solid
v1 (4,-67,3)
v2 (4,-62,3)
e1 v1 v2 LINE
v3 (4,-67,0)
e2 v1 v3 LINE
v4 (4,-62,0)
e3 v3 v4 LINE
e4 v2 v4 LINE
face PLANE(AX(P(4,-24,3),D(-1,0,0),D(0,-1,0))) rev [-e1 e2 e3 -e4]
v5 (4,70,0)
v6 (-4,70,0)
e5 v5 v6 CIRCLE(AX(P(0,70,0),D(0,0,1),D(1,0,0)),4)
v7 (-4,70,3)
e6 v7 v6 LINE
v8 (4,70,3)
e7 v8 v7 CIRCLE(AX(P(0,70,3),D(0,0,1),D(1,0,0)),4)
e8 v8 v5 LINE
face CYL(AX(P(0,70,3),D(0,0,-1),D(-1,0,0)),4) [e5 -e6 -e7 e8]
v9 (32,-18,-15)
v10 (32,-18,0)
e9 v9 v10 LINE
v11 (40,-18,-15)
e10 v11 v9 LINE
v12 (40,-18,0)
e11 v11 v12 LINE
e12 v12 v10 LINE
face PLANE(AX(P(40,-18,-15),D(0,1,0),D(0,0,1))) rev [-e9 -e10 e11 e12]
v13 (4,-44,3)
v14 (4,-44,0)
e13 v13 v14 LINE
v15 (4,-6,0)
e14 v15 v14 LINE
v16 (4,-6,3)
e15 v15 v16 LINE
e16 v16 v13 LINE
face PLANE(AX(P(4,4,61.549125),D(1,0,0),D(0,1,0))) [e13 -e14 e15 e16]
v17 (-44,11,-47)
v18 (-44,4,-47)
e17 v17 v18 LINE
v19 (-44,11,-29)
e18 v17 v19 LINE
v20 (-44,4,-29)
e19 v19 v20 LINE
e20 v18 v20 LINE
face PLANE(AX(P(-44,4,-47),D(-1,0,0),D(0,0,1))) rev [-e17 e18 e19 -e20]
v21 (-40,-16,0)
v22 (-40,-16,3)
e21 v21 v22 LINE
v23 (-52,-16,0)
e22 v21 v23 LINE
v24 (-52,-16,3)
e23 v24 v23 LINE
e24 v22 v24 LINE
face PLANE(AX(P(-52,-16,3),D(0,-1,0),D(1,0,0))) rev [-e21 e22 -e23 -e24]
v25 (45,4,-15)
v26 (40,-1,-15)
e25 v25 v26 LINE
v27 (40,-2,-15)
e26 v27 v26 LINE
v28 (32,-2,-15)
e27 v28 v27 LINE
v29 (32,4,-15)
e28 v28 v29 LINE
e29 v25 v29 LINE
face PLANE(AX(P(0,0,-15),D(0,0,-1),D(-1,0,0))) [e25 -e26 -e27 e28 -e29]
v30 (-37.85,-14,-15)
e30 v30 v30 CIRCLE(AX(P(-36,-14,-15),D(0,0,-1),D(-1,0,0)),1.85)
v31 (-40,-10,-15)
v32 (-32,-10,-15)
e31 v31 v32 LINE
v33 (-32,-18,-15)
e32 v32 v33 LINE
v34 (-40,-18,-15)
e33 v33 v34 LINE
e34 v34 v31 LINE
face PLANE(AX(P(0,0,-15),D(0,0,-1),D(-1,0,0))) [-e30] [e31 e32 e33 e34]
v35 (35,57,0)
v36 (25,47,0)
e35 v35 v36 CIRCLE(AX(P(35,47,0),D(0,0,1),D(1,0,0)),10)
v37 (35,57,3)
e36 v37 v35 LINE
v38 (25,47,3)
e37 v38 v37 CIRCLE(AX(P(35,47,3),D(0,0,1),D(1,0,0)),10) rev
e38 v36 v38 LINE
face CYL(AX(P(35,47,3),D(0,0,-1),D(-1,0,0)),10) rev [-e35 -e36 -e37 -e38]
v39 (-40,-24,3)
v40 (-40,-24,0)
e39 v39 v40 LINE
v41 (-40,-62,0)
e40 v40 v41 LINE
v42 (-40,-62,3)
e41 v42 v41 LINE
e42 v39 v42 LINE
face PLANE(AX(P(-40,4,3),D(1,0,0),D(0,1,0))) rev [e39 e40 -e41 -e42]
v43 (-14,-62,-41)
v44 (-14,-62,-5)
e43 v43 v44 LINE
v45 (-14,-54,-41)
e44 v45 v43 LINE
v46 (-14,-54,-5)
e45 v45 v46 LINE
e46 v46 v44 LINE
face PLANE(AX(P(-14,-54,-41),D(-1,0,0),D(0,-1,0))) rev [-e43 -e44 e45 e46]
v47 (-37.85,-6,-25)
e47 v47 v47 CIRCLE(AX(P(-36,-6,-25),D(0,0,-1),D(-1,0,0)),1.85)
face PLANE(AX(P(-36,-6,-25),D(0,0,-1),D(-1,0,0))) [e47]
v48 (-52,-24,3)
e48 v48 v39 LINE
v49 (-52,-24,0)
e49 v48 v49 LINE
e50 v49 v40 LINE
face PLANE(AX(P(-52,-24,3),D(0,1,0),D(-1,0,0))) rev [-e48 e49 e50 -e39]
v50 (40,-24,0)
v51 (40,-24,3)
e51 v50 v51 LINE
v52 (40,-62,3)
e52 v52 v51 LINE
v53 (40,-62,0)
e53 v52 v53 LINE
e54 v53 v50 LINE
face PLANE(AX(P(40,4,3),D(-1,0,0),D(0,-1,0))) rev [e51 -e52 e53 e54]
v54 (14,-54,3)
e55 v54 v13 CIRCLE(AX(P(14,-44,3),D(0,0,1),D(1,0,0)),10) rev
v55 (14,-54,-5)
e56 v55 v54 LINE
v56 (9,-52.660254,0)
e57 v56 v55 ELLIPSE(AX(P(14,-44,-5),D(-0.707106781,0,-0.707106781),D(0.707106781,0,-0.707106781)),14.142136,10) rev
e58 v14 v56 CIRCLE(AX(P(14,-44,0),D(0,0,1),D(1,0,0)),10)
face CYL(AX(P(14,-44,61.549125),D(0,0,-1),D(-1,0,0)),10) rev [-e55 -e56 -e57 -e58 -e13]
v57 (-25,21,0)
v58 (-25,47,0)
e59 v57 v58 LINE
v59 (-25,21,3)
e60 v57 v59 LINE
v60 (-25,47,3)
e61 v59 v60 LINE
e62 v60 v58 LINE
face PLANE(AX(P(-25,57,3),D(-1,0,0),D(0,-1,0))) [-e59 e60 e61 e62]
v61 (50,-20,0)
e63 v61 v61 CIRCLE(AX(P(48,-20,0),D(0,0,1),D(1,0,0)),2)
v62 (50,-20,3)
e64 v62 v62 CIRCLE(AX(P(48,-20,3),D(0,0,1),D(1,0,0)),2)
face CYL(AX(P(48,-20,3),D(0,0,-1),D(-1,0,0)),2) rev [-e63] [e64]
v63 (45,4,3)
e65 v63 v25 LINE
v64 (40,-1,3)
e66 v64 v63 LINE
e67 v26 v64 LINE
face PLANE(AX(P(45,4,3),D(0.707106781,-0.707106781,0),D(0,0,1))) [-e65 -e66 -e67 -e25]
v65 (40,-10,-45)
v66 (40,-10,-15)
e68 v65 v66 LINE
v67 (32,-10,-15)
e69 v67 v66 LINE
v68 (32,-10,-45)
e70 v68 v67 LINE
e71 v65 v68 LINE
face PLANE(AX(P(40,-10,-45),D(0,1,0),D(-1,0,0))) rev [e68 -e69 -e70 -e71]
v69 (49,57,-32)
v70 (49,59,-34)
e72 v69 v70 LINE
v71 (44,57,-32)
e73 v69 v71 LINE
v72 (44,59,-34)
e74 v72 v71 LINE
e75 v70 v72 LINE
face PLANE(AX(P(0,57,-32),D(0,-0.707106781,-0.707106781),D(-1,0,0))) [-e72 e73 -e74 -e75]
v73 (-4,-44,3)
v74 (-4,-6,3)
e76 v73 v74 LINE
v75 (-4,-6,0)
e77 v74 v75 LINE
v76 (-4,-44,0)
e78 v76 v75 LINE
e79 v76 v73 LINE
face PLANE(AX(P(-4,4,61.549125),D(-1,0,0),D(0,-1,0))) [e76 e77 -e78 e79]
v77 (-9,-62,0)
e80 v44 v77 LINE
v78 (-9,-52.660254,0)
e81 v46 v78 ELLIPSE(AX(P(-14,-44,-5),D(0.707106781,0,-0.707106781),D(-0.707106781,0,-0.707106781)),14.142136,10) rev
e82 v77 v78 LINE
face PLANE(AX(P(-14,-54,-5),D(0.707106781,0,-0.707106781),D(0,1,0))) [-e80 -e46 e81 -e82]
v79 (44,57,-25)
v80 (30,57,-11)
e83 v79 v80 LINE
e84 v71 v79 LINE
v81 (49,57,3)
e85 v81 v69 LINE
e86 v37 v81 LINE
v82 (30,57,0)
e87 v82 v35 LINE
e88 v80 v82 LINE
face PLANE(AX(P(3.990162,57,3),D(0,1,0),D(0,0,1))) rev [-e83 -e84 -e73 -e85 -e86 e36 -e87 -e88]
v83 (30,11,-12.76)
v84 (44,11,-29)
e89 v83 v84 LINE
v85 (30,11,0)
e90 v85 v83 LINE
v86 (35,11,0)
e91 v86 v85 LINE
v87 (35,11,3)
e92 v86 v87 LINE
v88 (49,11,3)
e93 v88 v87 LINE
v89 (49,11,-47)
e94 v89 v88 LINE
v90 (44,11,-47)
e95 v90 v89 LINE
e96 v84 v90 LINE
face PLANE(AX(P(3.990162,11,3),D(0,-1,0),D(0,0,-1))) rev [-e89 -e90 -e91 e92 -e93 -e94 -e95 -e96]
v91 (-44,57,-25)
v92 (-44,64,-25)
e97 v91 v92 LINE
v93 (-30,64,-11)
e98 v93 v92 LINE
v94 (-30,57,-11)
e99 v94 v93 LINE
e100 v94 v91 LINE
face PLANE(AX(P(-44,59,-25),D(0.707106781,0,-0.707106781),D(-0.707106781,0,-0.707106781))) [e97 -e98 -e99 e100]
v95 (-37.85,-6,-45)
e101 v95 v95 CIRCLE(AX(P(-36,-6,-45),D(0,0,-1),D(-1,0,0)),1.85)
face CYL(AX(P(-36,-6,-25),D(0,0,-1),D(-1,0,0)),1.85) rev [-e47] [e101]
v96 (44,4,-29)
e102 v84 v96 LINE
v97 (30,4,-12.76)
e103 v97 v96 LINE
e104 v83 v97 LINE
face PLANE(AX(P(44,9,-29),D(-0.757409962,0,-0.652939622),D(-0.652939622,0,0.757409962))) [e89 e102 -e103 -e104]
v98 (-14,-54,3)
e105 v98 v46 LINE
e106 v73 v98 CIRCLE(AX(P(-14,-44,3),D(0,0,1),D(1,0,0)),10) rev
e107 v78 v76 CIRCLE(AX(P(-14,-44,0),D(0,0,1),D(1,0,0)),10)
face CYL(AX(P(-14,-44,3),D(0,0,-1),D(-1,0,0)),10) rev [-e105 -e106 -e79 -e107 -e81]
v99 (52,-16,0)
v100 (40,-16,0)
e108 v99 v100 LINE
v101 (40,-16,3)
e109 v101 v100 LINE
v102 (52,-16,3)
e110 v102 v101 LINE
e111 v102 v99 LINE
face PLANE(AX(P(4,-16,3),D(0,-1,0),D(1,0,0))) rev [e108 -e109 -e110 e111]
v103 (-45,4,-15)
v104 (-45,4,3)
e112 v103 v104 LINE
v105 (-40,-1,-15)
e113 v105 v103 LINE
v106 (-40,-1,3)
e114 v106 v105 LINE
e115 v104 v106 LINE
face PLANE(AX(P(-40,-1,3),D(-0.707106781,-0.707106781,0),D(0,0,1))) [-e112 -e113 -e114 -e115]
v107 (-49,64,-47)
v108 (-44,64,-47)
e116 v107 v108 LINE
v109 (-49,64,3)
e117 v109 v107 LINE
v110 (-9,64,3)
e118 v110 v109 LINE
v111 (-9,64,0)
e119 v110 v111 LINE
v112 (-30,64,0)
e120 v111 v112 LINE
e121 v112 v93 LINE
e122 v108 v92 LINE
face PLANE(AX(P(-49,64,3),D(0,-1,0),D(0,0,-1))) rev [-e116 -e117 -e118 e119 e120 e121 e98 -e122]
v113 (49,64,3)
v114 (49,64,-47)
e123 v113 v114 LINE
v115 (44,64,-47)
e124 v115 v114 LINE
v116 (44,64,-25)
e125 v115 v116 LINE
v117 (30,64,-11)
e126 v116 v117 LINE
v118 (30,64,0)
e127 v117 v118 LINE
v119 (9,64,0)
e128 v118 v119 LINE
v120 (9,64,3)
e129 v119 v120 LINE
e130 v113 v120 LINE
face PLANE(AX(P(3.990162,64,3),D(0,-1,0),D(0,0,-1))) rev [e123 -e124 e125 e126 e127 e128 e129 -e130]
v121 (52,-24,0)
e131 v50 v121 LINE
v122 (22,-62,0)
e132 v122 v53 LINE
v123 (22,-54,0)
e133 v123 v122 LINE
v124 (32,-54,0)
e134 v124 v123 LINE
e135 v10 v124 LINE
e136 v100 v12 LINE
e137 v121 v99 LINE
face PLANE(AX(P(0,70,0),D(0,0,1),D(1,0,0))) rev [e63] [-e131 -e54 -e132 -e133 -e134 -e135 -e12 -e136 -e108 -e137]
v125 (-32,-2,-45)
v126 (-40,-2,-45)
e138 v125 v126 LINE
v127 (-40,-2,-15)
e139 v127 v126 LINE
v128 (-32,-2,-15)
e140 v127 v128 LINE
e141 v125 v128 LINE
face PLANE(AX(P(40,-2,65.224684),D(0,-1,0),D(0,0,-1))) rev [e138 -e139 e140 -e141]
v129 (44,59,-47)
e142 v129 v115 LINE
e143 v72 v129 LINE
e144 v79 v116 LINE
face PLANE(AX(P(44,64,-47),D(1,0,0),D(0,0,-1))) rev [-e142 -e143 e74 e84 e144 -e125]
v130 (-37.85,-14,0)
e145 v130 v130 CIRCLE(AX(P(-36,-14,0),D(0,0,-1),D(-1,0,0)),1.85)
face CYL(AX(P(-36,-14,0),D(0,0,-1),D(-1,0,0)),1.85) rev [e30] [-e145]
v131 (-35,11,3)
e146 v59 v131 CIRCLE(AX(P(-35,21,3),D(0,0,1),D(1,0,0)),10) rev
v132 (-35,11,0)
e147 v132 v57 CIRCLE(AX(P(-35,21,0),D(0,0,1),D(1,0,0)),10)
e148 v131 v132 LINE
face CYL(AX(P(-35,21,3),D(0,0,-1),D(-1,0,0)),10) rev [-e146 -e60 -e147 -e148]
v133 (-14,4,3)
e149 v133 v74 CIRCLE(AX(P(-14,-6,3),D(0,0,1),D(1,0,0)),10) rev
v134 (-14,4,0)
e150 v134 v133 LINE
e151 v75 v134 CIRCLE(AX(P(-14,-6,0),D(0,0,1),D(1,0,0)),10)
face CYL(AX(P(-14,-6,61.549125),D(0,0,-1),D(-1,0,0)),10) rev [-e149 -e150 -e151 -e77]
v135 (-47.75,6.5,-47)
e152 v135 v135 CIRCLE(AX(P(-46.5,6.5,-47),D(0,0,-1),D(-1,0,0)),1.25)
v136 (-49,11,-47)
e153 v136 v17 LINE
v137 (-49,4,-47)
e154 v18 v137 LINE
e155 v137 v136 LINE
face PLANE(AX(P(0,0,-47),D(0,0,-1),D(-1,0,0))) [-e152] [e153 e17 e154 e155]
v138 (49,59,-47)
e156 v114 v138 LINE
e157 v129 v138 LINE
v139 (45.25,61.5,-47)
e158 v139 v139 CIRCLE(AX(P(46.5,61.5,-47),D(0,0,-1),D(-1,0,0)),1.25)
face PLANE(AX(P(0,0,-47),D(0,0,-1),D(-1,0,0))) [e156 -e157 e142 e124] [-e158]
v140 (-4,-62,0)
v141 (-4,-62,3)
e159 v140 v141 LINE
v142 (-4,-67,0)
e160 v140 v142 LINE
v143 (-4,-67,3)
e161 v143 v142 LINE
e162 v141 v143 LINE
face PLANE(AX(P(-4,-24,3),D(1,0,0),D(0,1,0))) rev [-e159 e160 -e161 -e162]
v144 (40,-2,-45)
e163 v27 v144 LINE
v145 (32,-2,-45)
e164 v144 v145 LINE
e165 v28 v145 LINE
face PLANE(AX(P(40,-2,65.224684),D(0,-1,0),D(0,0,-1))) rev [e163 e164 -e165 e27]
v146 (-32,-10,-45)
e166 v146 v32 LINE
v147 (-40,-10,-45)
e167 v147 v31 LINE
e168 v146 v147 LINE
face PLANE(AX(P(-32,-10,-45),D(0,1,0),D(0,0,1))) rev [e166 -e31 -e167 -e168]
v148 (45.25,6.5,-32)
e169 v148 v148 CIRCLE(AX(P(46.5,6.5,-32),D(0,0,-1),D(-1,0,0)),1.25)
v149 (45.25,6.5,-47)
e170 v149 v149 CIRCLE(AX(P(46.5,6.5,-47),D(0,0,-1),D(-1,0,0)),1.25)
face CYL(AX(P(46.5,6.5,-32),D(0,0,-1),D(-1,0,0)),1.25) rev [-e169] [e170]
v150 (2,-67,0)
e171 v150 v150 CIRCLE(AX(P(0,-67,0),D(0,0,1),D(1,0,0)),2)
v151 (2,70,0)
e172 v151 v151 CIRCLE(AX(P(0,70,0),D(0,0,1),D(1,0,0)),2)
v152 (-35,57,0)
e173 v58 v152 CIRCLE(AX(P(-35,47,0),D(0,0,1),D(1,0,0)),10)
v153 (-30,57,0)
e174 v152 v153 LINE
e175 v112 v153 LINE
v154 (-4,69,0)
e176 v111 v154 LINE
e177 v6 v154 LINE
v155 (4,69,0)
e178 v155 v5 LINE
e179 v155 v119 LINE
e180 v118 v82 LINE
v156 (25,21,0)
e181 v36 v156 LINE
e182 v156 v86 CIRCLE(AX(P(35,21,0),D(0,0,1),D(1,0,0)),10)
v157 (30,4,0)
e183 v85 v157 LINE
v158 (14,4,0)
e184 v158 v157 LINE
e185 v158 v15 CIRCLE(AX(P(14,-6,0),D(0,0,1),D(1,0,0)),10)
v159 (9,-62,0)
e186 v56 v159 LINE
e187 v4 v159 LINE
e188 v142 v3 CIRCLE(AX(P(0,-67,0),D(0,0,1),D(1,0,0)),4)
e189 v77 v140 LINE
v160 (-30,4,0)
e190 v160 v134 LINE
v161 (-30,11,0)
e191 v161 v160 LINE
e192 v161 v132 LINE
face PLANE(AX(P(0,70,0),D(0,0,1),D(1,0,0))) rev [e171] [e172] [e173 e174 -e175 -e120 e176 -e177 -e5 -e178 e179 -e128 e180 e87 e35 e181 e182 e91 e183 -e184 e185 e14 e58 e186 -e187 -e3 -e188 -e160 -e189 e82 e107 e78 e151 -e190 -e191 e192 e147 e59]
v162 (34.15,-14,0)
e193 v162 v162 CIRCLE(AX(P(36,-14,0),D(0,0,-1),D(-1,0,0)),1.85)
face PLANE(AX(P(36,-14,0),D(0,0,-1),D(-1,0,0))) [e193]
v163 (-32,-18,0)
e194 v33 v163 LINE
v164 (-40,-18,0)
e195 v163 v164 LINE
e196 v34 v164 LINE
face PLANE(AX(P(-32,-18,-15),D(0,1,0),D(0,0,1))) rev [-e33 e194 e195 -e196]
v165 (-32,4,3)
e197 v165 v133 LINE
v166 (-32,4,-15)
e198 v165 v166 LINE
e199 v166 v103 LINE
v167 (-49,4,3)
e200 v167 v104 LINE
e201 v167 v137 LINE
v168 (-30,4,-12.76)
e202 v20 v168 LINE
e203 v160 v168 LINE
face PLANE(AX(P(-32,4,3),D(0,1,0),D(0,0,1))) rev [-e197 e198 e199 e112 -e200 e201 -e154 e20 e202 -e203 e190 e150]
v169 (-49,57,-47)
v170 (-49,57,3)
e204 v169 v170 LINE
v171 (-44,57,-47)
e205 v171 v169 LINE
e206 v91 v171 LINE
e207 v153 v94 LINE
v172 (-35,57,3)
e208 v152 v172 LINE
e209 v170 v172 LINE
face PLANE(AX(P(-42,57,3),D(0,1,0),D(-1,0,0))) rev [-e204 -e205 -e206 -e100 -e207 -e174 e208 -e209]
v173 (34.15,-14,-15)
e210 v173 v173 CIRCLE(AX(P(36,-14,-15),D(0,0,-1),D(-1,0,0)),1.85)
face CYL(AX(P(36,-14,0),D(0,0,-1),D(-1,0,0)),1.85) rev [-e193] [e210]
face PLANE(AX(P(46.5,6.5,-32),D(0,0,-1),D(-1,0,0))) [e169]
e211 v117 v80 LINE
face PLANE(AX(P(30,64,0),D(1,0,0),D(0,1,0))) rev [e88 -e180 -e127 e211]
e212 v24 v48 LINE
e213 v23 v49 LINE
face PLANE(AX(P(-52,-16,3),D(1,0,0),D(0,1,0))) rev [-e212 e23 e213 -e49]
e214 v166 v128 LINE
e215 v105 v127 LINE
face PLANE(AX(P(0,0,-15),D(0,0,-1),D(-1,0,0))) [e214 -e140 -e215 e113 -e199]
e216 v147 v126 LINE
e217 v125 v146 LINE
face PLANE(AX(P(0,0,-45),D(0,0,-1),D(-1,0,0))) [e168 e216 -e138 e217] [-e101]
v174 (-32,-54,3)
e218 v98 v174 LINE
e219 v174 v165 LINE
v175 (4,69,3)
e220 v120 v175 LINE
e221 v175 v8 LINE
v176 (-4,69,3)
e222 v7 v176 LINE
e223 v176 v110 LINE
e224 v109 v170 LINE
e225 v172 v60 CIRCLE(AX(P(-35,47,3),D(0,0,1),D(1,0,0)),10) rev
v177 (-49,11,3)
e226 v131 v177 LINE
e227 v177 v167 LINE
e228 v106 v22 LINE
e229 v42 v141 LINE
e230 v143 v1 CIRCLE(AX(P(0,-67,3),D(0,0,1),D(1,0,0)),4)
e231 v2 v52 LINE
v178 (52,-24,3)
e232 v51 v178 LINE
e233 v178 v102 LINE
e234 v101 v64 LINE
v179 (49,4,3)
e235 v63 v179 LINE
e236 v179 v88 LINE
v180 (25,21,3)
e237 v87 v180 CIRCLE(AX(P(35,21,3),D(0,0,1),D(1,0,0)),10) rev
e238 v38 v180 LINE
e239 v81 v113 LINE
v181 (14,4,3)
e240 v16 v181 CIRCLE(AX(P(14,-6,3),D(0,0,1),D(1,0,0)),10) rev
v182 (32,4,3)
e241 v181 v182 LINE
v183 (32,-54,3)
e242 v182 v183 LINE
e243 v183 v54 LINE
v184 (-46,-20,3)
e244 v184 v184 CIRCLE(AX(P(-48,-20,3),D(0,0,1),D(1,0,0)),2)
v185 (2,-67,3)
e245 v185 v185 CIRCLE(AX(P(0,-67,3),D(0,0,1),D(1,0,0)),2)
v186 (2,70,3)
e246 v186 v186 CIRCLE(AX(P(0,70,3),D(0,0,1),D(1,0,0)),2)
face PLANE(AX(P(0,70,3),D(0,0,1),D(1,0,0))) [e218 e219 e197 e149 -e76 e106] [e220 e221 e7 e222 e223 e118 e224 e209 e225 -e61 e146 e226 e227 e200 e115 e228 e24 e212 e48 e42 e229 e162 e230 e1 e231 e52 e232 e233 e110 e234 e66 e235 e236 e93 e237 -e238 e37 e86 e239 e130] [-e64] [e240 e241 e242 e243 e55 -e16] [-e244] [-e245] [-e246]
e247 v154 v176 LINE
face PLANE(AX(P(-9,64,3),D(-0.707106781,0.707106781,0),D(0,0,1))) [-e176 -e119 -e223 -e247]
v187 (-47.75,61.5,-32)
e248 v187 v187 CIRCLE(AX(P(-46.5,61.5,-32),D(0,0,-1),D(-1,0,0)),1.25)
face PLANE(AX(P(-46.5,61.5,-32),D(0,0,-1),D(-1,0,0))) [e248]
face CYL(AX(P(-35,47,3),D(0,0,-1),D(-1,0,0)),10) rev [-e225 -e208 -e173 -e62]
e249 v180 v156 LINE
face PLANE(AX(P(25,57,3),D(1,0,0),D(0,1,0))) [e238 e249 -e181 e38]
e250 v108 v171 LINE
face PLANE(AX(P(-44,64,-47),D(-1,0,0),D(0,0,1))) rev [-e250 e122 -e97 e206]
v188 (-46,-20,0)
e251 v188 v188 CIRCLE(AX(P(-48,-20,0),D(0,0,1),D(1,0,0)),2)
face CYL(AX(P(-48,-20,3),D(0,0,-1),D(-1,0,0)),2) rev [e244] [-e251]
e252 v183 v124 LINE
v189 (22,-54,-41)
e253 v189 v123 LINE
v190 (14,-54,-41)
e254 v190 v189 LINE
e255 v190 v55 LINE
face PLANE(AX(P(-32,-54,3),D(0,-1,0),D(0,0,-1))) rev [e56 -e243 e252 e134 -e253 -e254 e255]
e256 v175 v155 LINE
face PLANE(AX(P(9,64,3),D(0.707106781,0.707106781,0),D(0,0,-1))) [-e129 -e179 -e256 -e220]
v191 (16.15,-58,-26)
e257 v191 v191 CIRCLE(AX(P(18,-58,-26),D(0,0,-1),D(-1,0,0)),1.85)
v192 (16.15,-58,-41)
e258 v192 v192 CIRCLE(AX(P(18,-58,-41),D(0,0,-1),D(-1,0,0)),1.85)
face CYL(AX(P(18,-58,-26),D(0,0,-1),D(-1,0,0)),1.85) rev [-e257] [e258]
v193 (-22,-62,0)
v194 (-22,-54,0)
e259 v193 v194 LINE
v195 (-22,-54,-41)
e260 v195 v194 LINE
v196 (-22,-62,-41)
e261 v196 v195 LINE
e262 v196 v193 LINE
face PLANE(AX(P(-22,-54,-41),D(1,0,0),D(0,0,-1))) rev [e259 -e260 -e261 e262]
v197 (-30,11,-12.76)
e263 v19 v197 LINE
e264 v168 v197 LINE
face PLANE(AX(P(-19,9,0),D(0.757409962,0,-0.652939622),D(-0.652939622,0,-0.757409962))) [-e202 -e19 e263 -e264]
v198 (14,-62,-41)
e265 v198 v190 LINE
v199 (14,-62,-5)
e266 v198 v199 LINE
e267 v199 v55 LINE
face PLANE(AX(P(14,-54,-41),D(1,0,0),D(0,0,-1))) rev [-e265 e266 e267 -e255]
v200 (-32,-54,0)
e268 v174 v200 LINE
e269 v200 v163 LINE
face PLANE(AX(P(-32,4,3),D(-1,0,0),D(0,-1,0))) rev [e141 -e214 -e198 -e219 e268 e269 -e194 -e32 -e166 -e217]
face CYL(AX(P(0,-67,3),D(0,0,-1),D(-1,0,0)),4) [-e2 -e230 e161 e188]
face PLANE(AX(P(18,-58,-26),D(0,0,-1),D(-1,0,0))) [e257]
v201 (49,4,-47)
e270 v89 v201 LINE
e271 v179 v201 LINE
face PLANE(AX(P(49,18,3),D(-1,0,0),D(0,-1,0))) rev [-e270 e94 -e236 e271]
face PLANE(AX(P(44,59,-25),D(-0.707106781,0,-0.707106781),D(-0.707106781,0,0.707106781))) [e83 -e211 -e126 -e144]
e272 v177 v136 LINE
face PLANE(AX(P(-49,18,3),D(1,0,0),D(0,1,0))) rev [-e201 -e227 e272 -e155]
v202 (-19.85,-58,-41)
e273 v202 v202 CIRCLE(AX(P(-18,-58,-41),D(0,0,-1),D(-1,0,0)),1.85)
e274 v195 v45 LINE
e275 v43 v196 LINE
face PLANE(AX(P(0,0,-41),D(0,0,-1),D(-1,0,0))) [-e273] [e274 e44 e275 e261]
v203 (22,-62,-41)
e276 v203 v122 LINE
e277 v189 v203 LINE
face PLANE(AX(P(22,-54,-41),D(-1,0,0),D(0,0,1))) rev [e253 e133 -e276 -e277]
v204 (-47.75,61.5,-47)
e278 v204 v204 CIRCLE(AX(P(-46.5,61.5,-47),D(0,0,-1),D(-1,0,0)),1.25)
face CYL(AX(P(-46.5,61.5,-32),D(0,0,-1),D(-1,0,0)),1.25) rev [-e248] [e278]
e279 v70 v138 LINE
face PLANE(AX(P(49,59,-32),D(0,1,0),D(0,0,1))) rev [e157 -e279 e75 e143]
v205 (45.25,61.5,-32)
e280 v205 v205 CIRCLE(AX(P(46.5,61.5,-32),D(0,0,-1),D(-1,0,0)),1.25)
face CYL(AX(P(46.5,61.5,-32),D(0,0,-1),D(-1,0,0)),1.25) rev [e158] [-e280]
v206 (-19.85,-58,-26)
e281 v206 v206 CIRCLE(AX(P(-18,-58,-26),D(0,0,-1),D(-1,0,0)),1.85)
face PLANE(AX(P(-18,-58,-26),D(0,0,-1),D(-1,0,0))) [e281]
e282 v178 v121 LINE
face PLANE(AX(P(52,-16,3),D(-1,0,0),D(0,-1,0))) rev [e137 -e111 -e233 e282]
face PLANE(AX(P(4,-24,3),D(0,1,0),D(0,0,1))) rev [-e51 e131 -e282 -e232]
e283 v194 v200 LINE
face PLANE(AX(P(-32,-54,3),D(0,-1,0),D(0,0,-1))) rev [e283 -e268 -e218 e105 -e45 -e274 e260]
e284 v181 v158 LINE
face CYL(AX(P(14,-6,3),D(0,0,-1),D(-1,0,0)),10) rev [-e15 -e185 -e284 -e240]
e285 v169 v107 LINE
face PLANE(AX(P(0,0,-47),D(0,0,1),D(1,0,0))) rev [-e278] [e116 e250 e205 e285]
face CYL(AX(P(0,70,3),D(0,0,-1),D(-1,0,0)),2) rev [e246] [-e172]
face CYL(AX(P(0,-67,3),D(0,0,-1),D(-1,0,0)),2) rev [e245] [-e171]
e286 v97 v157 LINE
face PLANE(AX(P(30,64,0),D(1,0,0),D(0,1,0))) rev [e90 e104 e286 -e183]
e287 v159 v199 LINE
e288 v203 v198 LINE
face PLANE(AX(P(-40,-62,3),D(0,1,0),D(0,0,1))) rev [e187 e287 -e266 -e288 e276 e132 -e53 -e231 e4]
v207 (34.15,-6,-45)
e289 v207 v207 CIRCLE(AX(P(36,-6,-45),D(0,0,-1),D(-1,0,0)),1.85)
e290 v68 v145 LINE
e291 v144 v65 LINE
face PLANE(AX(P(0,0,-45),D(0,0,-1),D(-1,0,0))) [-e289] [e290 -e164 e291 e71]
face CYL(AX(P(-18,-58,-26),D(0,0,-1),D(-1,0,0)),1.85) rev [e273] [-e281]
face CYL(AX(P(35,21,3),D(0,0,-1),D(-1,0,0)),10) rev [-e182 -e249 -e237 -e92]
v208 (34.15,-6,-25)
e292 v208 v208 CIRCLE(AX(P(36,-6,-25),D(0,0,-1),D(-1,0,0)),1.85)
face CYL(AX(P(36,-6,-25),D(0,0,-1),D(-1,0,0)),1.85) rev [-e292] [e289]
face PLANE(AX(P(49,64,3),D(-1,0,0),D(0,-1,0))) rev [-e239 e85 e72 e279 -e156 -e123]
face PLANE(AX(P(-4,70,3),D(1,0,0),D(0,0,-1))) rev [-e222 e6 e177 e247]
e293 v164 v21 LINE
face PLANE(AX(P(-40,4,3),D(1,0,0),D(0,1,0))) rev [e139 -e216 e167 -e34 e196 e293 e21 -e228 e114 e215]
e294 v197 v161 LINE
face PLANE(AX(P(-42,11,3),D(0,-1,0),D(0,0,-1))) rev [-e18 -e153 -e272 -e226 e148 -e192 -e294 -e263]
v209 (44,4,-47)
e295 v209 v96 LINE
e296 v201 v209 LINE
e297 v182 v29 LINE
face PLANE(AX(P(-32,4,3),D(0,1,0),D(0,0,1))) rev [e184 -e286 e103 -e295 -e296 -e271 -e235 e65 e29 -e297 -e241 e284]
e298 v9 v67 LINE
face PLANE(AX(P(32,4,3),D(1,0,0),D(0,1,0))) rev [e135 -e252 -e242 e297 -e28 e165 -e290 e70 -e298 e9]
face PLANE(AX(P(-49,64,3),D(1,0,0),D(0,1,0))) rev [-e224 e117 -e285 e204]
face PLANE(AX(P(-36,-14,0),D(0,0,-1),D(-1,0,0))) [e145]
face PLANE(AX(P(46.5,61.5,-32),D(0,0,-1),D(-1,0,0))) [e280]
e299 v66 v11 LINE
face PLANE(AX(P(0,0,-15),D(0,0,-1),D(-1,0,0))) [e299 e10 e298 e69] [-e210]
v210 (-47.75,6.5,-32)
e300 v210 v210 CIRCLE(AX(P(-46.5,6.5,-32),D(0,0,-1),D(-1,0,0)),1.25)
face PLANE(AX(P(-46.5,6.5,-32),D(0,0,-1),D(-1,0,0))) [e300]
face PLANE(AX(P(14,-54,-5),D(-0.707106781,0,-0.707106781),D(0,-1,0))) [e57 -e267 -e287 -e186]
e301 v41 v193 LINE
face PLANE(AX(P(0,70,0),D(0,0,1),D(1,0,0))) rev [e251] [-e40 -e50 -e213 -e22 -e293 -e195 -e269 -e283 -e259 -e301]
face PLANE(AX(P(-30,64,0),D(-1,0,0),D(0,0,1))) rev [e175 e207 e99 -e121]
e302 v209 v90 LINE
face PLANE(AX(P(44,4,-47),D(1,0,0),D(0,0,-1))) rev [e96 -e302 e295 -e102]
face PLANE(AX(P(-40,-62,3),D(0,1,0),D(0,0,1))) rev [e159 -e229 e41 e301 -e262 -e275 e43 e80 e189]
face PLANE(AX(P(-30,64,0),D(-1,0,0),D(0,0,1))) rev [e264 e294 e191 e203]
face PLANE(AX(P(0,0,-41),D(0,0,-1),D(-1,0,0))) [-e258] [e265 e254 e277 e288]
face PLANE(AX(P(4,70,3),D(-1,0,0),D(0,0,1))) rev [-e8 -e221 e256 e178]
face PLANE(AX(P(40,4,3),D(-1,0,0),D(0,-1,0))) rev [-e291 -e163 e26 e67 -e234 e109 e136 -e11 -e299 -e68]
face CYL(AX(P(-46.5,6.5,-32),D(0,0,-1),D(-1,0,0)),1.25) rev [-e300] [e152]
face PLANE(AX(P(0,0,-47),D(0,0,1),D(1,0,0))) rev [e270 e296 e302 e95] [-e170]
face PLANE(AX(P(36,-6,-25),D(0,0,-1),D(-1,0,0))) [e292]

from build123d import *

# Parameters (mm, degrees)
SCHIZZO1_R                    = 2
ESTRUSIONE_ESTRUSIONE1_DEPTH  = 3
ESTRUSIONE_ESTRUSIONE2_DEPTH  = 3
SCHIZZO3_W                    = 5
SCHIZZO3_H                    = 5
ESTRUSIONE_ESTRUSIONE3_DEPTH  = 47
SCHIZZO4_R                    = 1.25
TAGLIO_ESTRUSIONE1_DEPTH      = 15
ESTRUSIONE_ESTRUSIONE4_DEPTH  = 5
ESTRUSIONE_ESTRUSIONE5_DEPTH  = 5
SCHIZZO9_W                    = 50
SCHIZZO9_H                    = 46
ESTRUSIONE_ESTRUSIONE8_DEPTH  = 3
SMUSSO1_SIZE                  = 5
SCHIZZO11_W                   = 17
SCHIZZO11_H                   = 46
SCHIZZO11_W_2                 = 64
SCHIZZO11_H_2                 = 58
TAGLIO_ESTRUSIONE3_DEPTH      = 10
SCHIZZO12_W                   = 60
SCHIZZO12_H                   = 20
TAGLIO_ESTRUSIONE4_DEPTH      = 60
SCHIZZO13_W                   = 27
SCHIZZO13_H                   = 46
TAGLIO_ESTRUSIONE5_DEPTH      = 10
RACCORDO1_R                   = 10
SCHIZZO14_W                   = 8
SCHIZZO14_H                   = 14
ESTRUSIONE_ESTRUSIONE9_DEPTH  = 45
SCHIZZO15_R                   = 1.85
TAGLIO_ESTRUSIONE6_DEPTH      = 20
SCHIZZO16_W                   = 8
SCHIZZO16_H                   = 8
ESTRUSIONE_ESTRUSIONE10_DEPTH = 15
SCHIZZO17_R                   = 1.85
TAGLIO_ESTRUSIONE7_DEPTH      = 15
SCHIZZO18_W                   = 8
SCHIZZO18_H                   = 8
ESTRUSIONE_ESTRUSIONE11_DEPTH = 41
SMUSSO3_SIZE                  = 5
SCHIZZO19_W                   = 8
SCHIZZO19_H                   = 58
ESTRUSIONE_ESTRUSIONE12_DEPTH = 3
RACCORDO2_R                   = 10
SCHIZZO20_R                   = 1.85
TAGLIO_ESTRUSIONE8_DEPTH      = 15
SCHIZZO21_W                   = 80
SCHIZZO21_H                   = 6
TAGLIO_ESTRUSIONE9_DEPTH      = 30
SMUSSO4_SIZE                  = 5
ESTRUSIONE_ESTRUSIONE13_DEPTH = 2
SCHIZZO23_W                   = 5
SCHIZZO23_H                   = 2
TAGLIO_ESTRUSIONE10_DEPTH     = 15
SMUSSO5_SIZE                  = 2
ESTRUSIONE_ESTRUSIONE14_DEPTH = 2


with BuildPart() as part:
    # Schizzo1 → Estrusione-Estrusione1 (new body)
    with BuildSketch(Plane.XY):
        with BuildLine():
            Line((4, 70), (4, 27))
            Line((4, 27), (52, 27))
            Line((52, 27), (52, 18))
            Line((52, 18), (4, 18))
            Line((4, 18), (4, -16))
            Line((4, -16), (52, -16))
            Line((52, -16), (52, -24))
            Line((52, -24), (4, -24))
            Line((4, -24), (4, -67))
            ThreePointArc((4, -67), (0, -71), (-4, -67))
            Line((-4, -67), (-4, -24))
            Line((-4, -24), (-52, -24))
            Line((-52, -24), (-52, -16))
            Line((-52, -16), (-4, -16))
            Line((-4, -16), (-4, 18))
            Line((-4, 18), (-52, 18))
            Line((-52, 18), (-52, 27))
            Line((-52, 27), (-4, 27))
            Line((-4, 27), (-4, 70))
            ThreePointArc((-4, 70), (0, 74), (4, 70))
        make_face()
        with Locations((0, 70)):
            Circle(SCHIZZO1_R, mode=Mode.SUBTRACT)
        with Locations((48, 23)):
            Circle(SCHIZZO1_R, mode=Mode.SUBTRACT)
        with Locations((-48, 23)):
            Circle(SCHIZZO1_R, mode=Mode.SUBTRACT)
        with Locations((0, -67)):
            Circle(SCHIZZO1_R, mode=Mode.SUBTRACT)
        with Locations((-48, -20)):
            Circle(SCHIZZO1_R, mode=Mode.SUBTRACT)
        with Locations((48, -20)):
            Circle(SCHIZZO1_R, mode=Mode.SUBTRACT)
    extrude(amount=ESTRUSIONE_ESTRUSIONE1_DEPTH)

    # Schizzo2 → Estrusione-Estrusione2 (add)
    with BuildSketch(Plane.XY):
        Polygon((-42, 57), (-3.921210291, 57), (-3.921210291, 64), (-49, 64), (-49, 26), (-42, 26), align=None)
        Polygon((-49, 4), (-40, 4), (-40, -62), (40, -62), (40, 4), (49, 4), (49, 18), (42, 18), (42, 11), (3.990161704, 11), (3.990161704, 4), (32, 4), (32, -54), (-32, -54), (-32, 4), (-3.921210291, 4), (-3.921210291, 11), (-42, 11), (-42, 18), (-49, 18), align=None)
        Polygon((49, 64), (49, 26), (42, 26), (42, 57), (3.990161704, 57), (3.990161704, 64), align=None)
    extrude(amount=ESTRUSIONE_ESTRUSIONE2_DEPTH)

    # Schizzo3 → Estrusione-Estrusione3 (add)
    with BuildSketch(Plane(origin=(0, 0, 0), x_dir=(-1, 0, 0), z_dir=(0, 0, -1))):
        with Locations((-46.5, 61.5)):
            Rectangle(SCHIZZO3_W, SCHIZZO3_H)
        with Locations((46.5, 61.5)):
            Rectangle(SCHIZZO3_W, SCHIZZO3_H)
        with Locations((46.5, 6.5)):
            Rectangle(SCHIZZO3_W, SCHIZZO3_H)
        with Locations((-46.5, 6.5)):
            Rectangle(SCHIZZO3_W, SCHIZZO3_H)
    extrude(amount=ESTRUSIONE_ESTRUSIONE3_DEPTH)

    # Schizzo4 → Taglio-Estrusione1 (cut)
    with BuildSketch(Plane(origin=(0, 0, -47), x_dir=(-1, 0, 0), z_dir=(0, 0, -1))):
        with Locations((-46.5, 61.5)):
            Circle(SCHIZZO4_R)
        with Locations((46.5, 61.5)):
            Circle(SCHIZZO4_R)
        with Locations((46.5, 6.5)):
            Circle(SCHIZZO4_R)
        with Locations((-46.5, 6.5)):
            Circle(SCHIZZO4_R)
    extrude(amount=-TAGLIO_ESTRUSIONE1_DEPTH, mode=Mode.SUBTRACT)

    # Schizzo5 → Estrusione-Estrusione4 (add)
    with BuildSketch(Plane.XZ.offset(-4)):
        Polygon((-44, 0), (-19, 0), (-44, -29), align=None)
        Polygon((19, 0), (44, 0), (44, -29), align=None)
    extrude(amount=-ESTRUSIONE_ESTRUSIONE4_DEPTH)

    # Schizzo6 → Estrusione-Estrusione5 (add)
    with BuildSketch(Plane(origin=(0, 64, 0), x_dir=(1, 0, 0), z_dir=(0, 1, 0))):
        Polygon((-44, 25), (-19, 0), (-44, 0), align=None)
        Polygon((44, 25), (19, 0), (44, 0), align=None)
    extrude(amount=-ESTRUSIONE_ESTRUSIONE5_DEPTH)

    # Schizzo9 → Estrusione-Estrusione8 (add)
    with BuildSketch(Plane(origin=(0, 0, 0), x_dir=(-1, 0, 0), z_dir=(0, 0, -1))):
        with Locations((0, 34)):
            Rectangle(SCHIZZO9_W, SCHIZZO9_H)
    extrude(amount=-ESTRUSIONE_ESTRUSIONE8_DEPTH)

    # Smusso1
    smusso1_edges = [part.edges().sort_by_distance(p)[0] for p in [
        (4, 64, 1.5),
        (-4, 64, 1.5),
    ]]
    chamfer(smusso1_edges, length=SMUSSO1_SIZE)

    # Schizzo11 → Taglio-Estrusione3 (cut)
    with BuildSketch(Plane(origin=(0, 0, 0), x_dir=(-1, 0, 0), z_dir=(0, 0, -1))):
        with Locations((-33.5, 34)):
            Rectangle(SCHIZZO11_W, SCHIZZO11_H)
        with Locations((33.5, 34)):
            Rectangle(SCHIZZO11_W, SCHIZZO11_H)
        with Locations((0, -25)):
            Rectangle(SCHIZZO11_W_2, SCHIZZO11_H_2)
    extrude(amount=-TAGLIO_ESTRUSIONE3_DEPTH, mode=Mode.SUBTRACT)

    # Schizzo12 → Taglio-Estrusione4 (cut)
    with BuildSketch(Plane.XZ.offset(-4)):
        with Locations((0, -10)):
            Rectangle(SCHIZZO12_W, SCHIZZO12_H)
    extrude(amount=-TAGLIO_ESTRUSIONE4_DEPTH, mode=Mode.SUBTRACT)

    # Schizzo13 → Taglio-Estrusione5 (cut)
    with BuildSketch(Plane(origin=(0, 0, 0), x_dir=(-1, 0, 0), z_dir=(0, 0, -1))):
        with Locations((38.5, 34)):
            Rectangle(SCHIZZO13_W, SCHIZZO13_H)
        with Locations((-38.5, 34)):
            Rectangle(SCHIZZO13_W, SCHIZZO13_H)
    extrude(amount=-TAGLIO_ESTRUSIONE5_DEPTH, mode=Mode.SUBTRACT)

    # Raccordo1
    raccordo1_edges = [part.edges().sort_by_distance(p)[0] for p in [
        (25, 57, 1.5),
        (-25, 11, 1.5),
        (-25, 57, 1.5),
        (25, 11, 1.5),
    ]]
    fillet(raccordo1_edges, radius=RACCORDO1_R)

    # Schizzo14 → Estrusione-Estrusione9 (add)
    with BuildSketch(Plane(origin=(0, 0, 0), x_dir=(-1, 0, 0), z_dir=(0, 0, -1))):
        with Locations((-36, -3)):
            Rectangle(SCHIZZO14_W, SCHIZZO14_H)
        with Locations((36, -3)):
            Rectangle(SCHIZZO14_W, SCHIZZO14_H)
    extrude(amount=ESTRUSIONE_ESTRUSIONE9_DEPTH)

    # Schizzo15 → Taglio-Estrusione6 (cut)
    with BuildSketch(Plane(origin=(0, 0, -45), x_dir=(-1, 0, 0), z_dir=(0, 0, -1))):
        with Locations((36, -6)):
            Circle(SCHIZZO15_R)
        with Locations((-36, -6)):
            Circle(SCHIZZO15_R)
    extrude(amount=-TAGLIO_ESTRUSIONE6_DEPTH, mode=Mode.SUBTRACT)

    # Schizzo16 → Estrusione-Estrusione10 (add)
    with BuildSketch(Plane(origin=(0, 0, 0), x_dir=(-1, 0, 0), z_dir=(0, 0, -1))):
        with Locations((-36, -14)):
            Rectangle(SCHIZZO16_W, SCHIZZO16_H)
        with Locations((36, -14)):
            Rectangle(SCHIZZO16_W, SCHIZZO16_H)
    extrude(amount=ESTRUSIONE_ESTRUSIONE10_DEPTH)

    # Schizzo17 → Taglio-Estrusione7 (cut)
    with BuildSketch(Plane(origin=(0, 0, -15), x_dir=(-1, 0, 0), z_dir=(0, 0, -1))):
        with Locations((-36, -14)):
            Circle(SCHIZZO17_R)
        with Locations((36, -14)):
            Circle(SCHIZZO17_R)
    extrude(amount=-TAGLIO_ESTRUSIONE7_DEPTH, mode=Mode.SUBTRACT)

    # Schizzo18 → Estrusione-Estrusione11 (add)
    with BuildSketch(Plane(origin=(0, 0, 0), x_dir=(-1, 0, 0), z_dir=(0, 0, -1))):
        with Locations((-18, -58)):
            Rectangle(SCHIZZO18_W, SCHIZZO18_H)
        with Locations((18, -58)):
            Rectangle(SCHIZZO18_W, SCHIZZO18_H)
    extrude(amount=ESTRUSIONE_ESTRUSIONE11_DEPTH)

    # Smusso3
    smusso3_edges = [part.edges().sort_by_distance(p)[0] for p in [
        (14, -58, 0),
        (-14, -58, 0),
    ]]
    chamfer(smusso3_edges, length=SMUSSO3_SIZE)

    # Schizzo19 → Estrusione-Estrusione12 (add)
    with BuildSketch(Plane(origin=(0, 0, 0), x_dir=(-1, 0, 0), z_dir=(0, 0, -1))):
        with Locations((0, -25)):
            Rectangle(SCHIZZO19_W, SCHIZZO19_H)
    extrude(amount=-ESTRUSIONE_ESTRUSIONE12_DEPTH)

    # Raccordo2
    raccordo2_edges = [part.edges().sort_by_distance(p)[0] for p in [
        (4, -54, 1.5),
        (-4, -54, 1.5),
        (4, 4, 1.5),
        (-4, 4, 1.5),
    ]]
    fillet(raccordo2_edges, radius=RACCORDO2_R)

    # Schizzo20 → Taglio-Estrusione8 (cut)
    with BuildSketch(Plane(origin=(0, 0, -41), x_dir=(-1, 0, 0), z_dir=(0, 0, -1))):
        with Locations((-18, -58)):
            Circle(SCHIZZO20_R)
        with Locations((18, -58)):
            Circle(SCHIZZO20_R)
    extrude(amount=-TAGLIO_ESTRUSIONE8_DEPTH, mode=Mode.SUBTRACT)

    # Schizzo21 → Taglio-Estrusione9 (cut)
    with BuildSketch(Plane(origin=(0, 0, -45), x_dir=(-1, 0, 0), z_dir=(0, 0, -1))):
        with Locations((0, 1)):
            Rectangle(SCHIZZO21_W, SCHIZZO21_H)
    extrude(amount=-TAGLIO_ESTRUSIONE9_DEPTH, mode=Mode.SUBTRACT)

    # Smusso4
    smusso4_edges = [part.edges().sort_by_distance(p)[0] for p in [
        (-40, 4, -6),
        (40, 4, -6),
    ]]
    chamfer(smusso4_edges, length=SMUSSO4_SIZE)

    # Schizzo22 → Estrusione-Estrusione13 (add)
    with BuildSketch(Plane.XZ.offset(-59)):
        Polygon((49, 0), (30, 0), (30, -11), (44, -25), (44, -47), (49, -47), align=None)
        Polygon((-30, 0), (-49, 0), (-49, -47), (-44, -47), (-44, -25), (-30, -11), align=None)
    extrude(amount=ESTRUSIONE_ESTRUSIONE13_DEPTH)

    # Schizzo23 → Taglio-Estrusione10 (cut)
    with BuildSketch(Plane(origin=(0, 0, -47), x_dir=(-1, 0, 0), z_dir=(0, 0, -1))):
        with Locations((-46.5, 58)):
            Rectangle(SCHIZZO23_W, SCHIZZO23_H)
    extrude(amount=-TAGLIO_ESTRUSIONE10_DEPTH, mode=Mode.SUBTRACT)

    # Smusso5
    smusso5_edges = [part.edges().sort_by_distance(p)[0] for p in [
        (46.5, 59, -32),
    ]]
    chamfer(smusso5_edges, length=SMUSSO5_SIZE - 0.0001)  # a hair under: the kernel refuses the full size

    # Schizzo24 → Estrusione-Estrusione14 (add)
    with BuildSketch(Plane(origin=(0, 9, 0), x_dir=(1, 0, 0), z_dir=(0, 1, 0))):
        Polygon((-49, 0), (-30, 0), (-30, 12.76), (-44, 29), (-44, 47), (-49, 47), align=None)
        Polygon((44, 47), (49, 47), (49, 0), (30, 0), (30, 12.76), (44, 29), align=None)
    extrude(amount=ESTRUSIONE_ESTRUSIONE14_DEPTH)


solid = part.part
